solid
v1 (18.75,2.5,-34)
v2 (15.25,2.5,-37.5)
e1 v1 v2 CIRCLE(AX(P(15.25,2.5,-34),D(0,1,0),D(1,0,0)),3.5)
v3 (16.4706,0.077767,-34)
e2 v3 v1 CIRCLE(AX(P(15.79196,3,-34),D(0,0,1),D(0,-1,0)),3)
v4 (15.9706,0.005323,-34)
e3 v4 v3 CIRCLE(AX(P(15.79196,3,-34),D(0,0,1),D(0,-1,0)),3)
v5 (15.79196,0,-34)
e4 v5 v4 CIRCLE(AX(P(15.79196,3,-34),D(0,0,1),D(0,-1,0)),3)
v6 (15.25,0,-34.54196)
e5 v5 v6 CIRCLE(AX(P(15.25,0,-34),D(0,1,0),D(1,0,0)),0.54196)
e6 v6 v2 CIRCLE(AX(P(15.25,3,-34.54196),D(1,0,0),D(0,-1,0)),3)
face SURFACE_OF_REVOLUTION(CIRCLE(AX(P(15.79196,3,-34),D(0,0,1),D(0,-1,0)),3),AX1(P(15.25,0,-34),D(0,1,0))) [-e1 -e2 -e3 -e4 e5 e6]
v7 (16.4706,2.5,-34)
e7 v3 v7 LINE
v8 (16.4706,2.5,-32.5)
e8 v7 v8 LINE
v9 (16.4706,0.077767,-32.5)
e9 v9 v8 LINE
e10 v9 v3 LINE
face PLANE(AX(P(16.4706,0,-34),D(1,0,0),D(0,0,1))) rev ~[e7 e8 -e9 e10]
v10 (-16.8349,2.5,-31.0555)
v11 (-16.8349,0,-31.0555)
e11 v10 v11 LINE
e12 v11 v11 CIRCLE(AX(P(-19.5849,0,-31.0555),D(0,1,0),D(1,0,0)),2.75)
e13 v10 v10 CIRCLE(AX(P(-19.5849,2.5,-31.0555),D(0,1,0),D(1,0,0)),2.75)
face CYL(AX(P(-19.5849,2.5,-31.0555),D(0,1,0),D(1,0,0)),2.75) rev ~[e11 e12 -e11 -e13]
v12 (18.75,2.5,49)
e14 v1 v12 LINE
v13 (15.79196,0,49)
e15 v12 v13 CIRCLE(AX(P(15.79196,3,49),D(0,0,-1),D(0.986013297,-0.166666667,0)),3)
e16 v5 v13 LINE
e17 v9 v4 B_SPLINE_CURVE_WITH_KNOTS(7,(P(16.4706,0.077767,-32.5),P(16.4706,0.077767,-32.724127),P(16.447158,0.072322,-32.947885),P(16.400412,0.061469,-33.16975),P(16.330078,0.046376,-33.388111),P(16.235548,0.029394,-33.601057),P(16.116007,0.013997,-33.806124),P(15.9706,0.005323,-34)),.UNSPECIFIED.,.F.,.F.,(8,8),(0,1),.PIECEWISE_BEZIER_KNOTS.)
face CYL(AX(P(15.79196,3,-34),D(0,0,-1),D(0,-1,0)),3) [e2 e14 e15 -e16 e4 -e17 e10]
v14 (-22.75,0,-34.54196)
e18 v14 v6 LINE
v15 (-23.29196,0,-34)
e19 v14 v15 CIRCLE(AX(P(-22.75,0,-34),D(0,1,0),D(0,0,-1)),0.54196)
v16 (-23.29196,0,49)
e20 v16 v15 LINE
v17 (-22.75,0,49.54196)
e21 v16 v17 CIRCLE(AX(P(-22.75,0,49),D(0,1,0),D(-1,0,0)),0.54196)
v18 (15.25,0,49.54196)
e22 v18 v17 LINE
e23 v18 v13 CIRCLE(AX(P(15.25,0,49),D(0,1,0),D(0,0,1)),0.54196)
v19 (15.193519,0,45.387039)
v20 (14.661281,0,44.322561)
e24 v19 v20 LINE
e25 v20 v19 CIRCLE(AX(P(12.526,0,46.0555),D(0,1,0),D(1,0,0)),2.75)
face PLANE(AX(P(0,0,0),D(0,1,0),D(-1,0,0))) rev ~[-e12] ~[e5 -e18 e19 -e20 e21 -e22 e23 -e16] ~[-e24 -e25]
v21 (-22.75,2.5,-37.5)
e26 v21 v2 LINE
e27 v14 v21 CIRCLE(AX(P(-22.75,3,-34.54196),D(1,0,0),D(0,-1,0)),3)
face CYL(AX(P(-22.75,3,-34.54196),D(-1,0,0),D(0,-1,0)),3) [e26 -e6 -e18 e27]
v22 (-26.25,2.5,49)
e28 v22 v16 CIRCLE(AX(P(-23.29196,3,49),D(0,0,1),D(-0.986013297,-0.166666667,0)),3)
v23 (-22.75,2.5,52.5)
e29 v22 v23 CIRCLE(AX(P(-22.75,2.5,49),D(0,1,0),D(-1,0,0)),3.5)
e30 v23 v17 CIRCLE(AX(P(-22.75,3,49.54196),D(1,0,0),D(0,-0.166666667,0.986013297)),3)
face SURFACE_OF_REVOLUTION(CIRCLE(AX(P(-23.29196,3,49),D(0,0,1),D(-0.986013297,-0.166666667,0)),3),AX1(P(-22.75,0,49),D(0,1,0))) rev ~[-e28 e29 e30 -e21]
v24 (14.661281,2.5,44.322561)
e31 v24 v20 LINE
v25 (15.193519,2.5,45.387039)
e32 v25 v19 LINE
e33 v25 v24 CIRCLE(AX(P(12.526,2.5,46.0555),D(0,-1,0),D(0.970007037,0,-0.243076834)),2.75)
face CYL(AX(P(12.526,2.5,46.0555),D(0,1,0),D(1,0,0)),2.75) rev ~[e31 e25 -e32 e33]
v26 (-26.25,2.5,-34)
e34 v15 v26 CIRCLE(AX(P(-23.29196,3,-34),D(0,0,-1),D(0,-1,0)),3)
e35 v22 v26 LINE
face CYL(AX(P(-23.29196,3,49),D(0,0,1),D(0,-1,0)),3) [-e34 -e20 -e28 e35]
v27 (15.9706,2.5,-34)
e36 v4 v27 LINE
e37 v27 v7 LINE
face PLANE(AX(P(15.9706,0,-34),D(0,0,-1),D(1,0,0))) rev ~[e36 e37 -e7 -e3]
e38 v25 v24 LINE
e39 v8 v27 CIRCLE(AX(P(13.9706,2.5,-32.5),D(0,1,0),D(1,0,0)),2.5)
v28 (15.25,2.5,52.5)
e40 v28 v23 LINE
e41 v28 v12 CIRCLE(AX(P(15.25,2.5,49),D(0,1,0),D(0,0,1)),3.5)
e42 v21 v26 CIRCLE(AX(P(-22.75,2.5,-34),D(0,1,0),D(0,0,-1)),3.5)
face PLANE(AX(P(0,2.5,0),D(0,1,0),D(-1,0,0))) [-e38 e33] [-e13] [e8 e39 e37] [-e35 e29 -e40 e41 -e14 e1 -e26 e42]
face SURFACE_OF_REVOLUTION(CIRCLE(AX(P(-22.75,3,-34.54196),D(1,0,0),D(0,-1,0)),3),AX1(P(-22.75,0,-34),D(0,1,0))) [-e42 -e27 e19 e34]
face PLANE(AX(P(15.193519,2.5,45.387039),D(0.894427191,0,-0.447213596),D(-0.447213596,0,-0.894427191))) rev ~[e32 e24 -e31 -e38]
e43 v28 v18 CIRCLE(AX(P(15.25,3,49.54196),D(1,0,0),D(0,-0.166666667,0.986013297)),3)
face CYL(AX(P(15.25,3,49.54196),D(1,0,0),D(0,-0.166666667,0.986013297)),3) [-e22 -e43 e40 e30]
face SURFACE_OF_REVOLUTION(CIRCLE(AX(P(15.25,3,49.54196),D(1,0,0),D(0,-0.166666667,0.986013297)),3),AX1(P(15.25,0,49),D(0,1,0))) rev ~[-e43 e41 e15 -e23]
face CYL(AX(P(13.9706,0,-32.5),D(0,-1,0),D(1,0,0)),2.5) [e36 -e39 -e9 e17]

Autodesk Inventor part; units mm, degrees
ref_plane "YZ Plane" through (0, 0, 0) normal (1, 0, 0) x (0, 1, 0)
ref_plane "XZ Plane" through (0, 0, 0) normal (0, 1, 0) x (-1, 0, 0)
ref_plane "XY Plane" through (0, 0, 0) normal (0, 0, 1) x (1, 0, 0)
sketch "Sketch1" plane through (0, 0, 0) normal (0, 1, 0) x (-1, 0, 0)
  line L0 (-18.75, 52.5) -> (26.25, 52.5)
  line L1 (26.25, 52.5) -> (26.25, -37.5)
  line L2 (26.25, -37.5) -> (-18.75, -37.5)
  line L3 (-18.75, -37.5) -> (-18.75, 52.5)
  line L4 (26.25, 52.5) -> (-18.75, -37.5) construction
  line L5 (-16.4706, 50) -> (23.5294, 50)
  line L6 (23.5294, 50) -> (23.5294, -35)
  line L7 (23.5294, -35) -> (-16.4706, -35)
  line L8 (-16.4706, -35) -> (-16.4706, 50)
  line L9 (23.5294, 50) -> (-16.4706, -35) construction
  line L10 (23.5294, 50) -> (21.0294, 50)
  line L11 (21.0294, 50) -> (21.0294, 47.5)
  line L12 (21.0294, 47.5) -> (23.5294, 47.5)
  line L13 (23.5294, 47.5) -> (23.5294, 50)
  arc A0 (23.5294, 47.5) -> (21.0294, 50) centre (21.0294, 47.5) ccw
  line L14 (26.25, 52.5) -> (22.75, 52.5)
  line L15 (22.75, 52.5) -> (22.75, 49)
  line L16 (22.75, 49) -> (26.25, 49)
  line L17 (26.25, 49) -> (26.25, 52.5)
  line L18 (23.5294, -35) -> (21.0294, -35)
  line L19 (21.0294, -35) -> (21.0294, -32.5)
  line L20 (21.0294, -32.5) -> (23.5294, -32.5)
  line L21 (23.5294, -32.5) -> (23.5294, -35)
  line L22 (-16.4706, -35) -> (-13.9706, -35)
  line L23 (-13.9706, -35) -> (-13.9706, -32.5)
  line L24 (-13.9706, -32.5) -> (-16.4706, -32.5)
  line L25 (-16.4706, -32.5) -> (-16.4706, -35)
  line L26 (-16.4706, 50) -> (-13.9706, 50)
  line L27 (-13.9706, 50) -> (-13.9706, 47.5)
  line L28 (-13.9706, 47.5) -> (-16.4706, 47.5)
  line L29 (-16.4706, 47.5) -> (-16.4706, 50)
  arc A1 (-13.9706, 50) -> (-16.4706, 47.5) centre (-13.9706, 47.5) ccw
  arc A2 (-16.4706, -32.5) -> (-13.9706, -35) centre (-13.9706, -32.5) ccw
  arc A3 (21.0294, -35) -> (23.5294, -32.5) centre (21.0294, -32.5) ccw
  arc A4 (26.25, 49) -> (22.75, 52.5) centre (22.75, 49) ccw
  line L30 (26.25, -37.5) -> (22.75, -37.5)
  line L31 (22.75, -37.5) -> (22.75, -34)
  line L32 (22.75, -34) -> (26.25, -34)
  line L33 (26.25, -34) -> (26.25, -37.5)
  line L34 (-18.75, -37.5) -> (-15.25, -37.5)
  line L35 (-15.25, -37.5) -> (-15.25, -34)
  line L36 (-15.25, -34) -> (-18.75, -34)
  line L37 (-18.75, -34) -> (-18.75, -37.5)
  line L38 (-18.75, 52.5) -> (-15.25, 52.5)
  line L39 (-15.25, 52.5) -> (-15.25, 49)
  line L40 (-15.25, 49) -> (-18.75, 49)
  line L41 (-18.75, 49) -> (-18.75, 52.5)
  arc A5 (-15.25, 52.5) -> (-18.75, 49) centre (-15.25, 49) ccw
  arc A6 (-18.75, -34) -> (-15.25, -37.5) centre (-15.25, -34) ccw
  arc A7 (22.75, -37.5) -> (26.25, -34) centre (22.75, -34) ccw
  point P0 (0, 0)
  point P1 (26.25, 49)
  point P2 (22.75, 52.5)
  point P3 (-18.75, -34)
  point P4 (-16.4706, -32.5)
  point P5 (-15.9706, -34)
  point P6 (-16.4706, -34)
  point P7 (23.5294, -32.5)
  dimension "d0" = 45
  dimension "d1" = 90
  dimension "d2" = 40
  dimension "d3" = 85
  dimension "d8" = 2.5
  dimension "d9" = 2.5
extrude "Extrusion3" add sketch "Sketch1" along normal blind 2.5 contours L0 L15 L5 L39 | L39 L5 L8 L40 A5 | L40 L8 L36 L3 | A4 L16 L6 L5 L15 | L39 A1 L40 L8 L5 | L5 A1 L39 | L36 L8 L7 L35 A6 | L40 A1 L8 | L15 A0 L5 | L5 L6 L16 A0 L15 | L1 L32 L6 L16 | L5 L11 L12 L6 L20 L19 L7 L23 L24 L8 L28 L27 | L27 L28 A1 L40 L39 | L39 L40 A1 | L36 A2 L35 L7 L8 | L35 L7 L31 L2 | A0 L15 L16 L12 L11 | A0 L16 L15 | A7 L31 L7 L6 L32 | L6 A0 L16 | L24 L23 A2 L35 L36 | L36 L35 A2 | L35 A2 L7 | L32 A3 L6 | L6 L7 L31 A3 L32 | L7 A3 L31 | A3 L32 L31 L19 L20 | A3 L31 L32
fillet "Fillet1" radius 3 8 edges at (-25.2249, 0, 51.4749) (-3.75, 0, 52.5) (17.7249, 0, 51.4749) (18.75, 0, 7.5) (17.7249, 0, -36.4749) (-3.75, 0, -37.5) (-25.2249, 0, -36.4749) (-26.25, 0, 7.5)
sketch "Sketch2" plane through (0, 2.5, 0) normal (0, 1, 0) x (1, 0, 0)
  arc A0 (16.4706, 32.5) -> (13.9706, 35) centre (13.9706, 32.5) ccw projected
  line L0 (13.9706, 35) -> (13.9706, 33.5)
  line L1 (16.4706, -47.5) -> (16.4706, 32.5) projected
  line L2 (16.4706, 32.5) -> (14.9706, 32.5)
  line L3 (14.9706, 32.5) -> (13.9706, 33.5)
  line L4 (14.4706, 33) -> (12.526, 31.0555)
  circle A1 centre (12.526, 31.0555) radius 2.75
  line L5 (-23.5294, 32.5) -> (-23.5294, -47.5) projected
  line L6 (-23.5294, -47.5) -> (-22.0294, -47.5)
  line L7 (-21.0294, -50) -> (13.9706, -50) projected
  line L8 (-21.0294, -50) -> (-21.0294, -48.5)
  line L9 (-21.0294, -48.5) -> (-22.0294, -47.5)
  line L10 (-21.5294, -48) -> (-19.5849, -46.0555)
  line L11 (-21.5294, -48) -> (-18.7794, -48) construction
  circle A2 centre (-19.5849, -46.0555) radius 2.75
  arc A3 (14.0518, 28.7675) -> (15.276, 31.0555) centre (12.526, 31.0555) ccw construction
  arc A4 (14.321, 28.3639) -> (15.7612, 31.0555) centre (12.526, 31.0555) ccw
  arc A5 (13.7826, 29.1712) -> (14.7909, 31.0555) centre (12.526, 31.0555) ccw
  arc A6 (13.7826, 29.1712) -> (14.321, 28.3639) centre (14.0518, 28.7675) ccw
  arc A7 (15.7612, 31.0555) -> (14.7909, 31.0555) centre (15.276, 31.0555) ccw
  arc A8 (10.7311, 33.747) -> (9.2909, 31.0555) centre (12.526, 31.0555) ccw
  arc A9 (9.2909, 31.0555) -> (10.2612, 31.0555) centre (9.776, 31.0555) ccw
  arc A10 (11.2694, 32.9398) -> (10.7311, 33.747) centre (11.0003, 33.3434) ccw
  arc A11 (11.2694, 32.9398) -> (10.2612, 31.0555) centre (12.526, 31.0555) ccw
  arc A12 (-17.79, -48.747) -> (-16.3497, -46.0555) centre (-19.5849, -46.0555) ccw
  arc A13 (-18.3283, -47.9398) -> (-17.32, -46.0555) centre (-19.5849, -46.0555) ccw
  arc A14 (-18.3283, -47.9398) -> (-17.79, -48.747) centre (-18.0591, -48.3434) ccw
  arc A15 (-16.3497, -46.0555) -> (-17.32, -46.0555) centre (-16.8349, -46.0555) ccw
  arc A16 (-21.3798, -43.3639) -> (-22.82, -46.0555) centre (-19.5849, -46.0555) ccw
  arc A17 (-22.82, -46.0555) -> (-21.8497, -46.0555) centre (-22.3349, -46.0555) ccw
  arc A18 (-20.8415, -44.1712) -> (-21.3798, -43.3639) centre (-21.1106, -43.7675) ccw
  arc A19 (-20.8415, -44.1712) -> (-21.8497, -46.0555) centre (-19.5849, -46.0555) ccw
  line L12 (-22.8137, -49.2843) -> (-20.2452, -46.7157) construction
  line L13 (-22.3894, -49.7085) -> (-19.8209, -47.14)
  line L14 (-20.6694, -46.2915) -> (-23.2379, -48.86)
  arc A20 (-23.2379, -48.86) -> (-22.3894, -49.7085) centre (-22.8137, -49.2843) ccw
  arc A21 (-19.8209, -47.14) -> (-20.6694, -46.2915) centre (-20.2452, -46.7157) ccw
  line L15 (12.9911, 31.5205) -> (15.9501, 34.4795) construction
  line L16 (13.4153, 31.0962) -> (16.3744, 34.0552)
  line L17 (15.5258, 34.9038) -> (12.5668, 31.9448)
  arc A22 (12.5668, 31.9448) -> (13.4153, 31.0962) centre (12.9911, 31.5205) ccw
  arc A23 (16.3744, 34.0552) -> (15.5258, 34.9038) centre (15.9501, 34.4795) ccw
  arc A24 (15.25, -52.5) -> (18.75, -49) centre (15.25, -49) ccw projected
  line L18 (15.25, -52.5) -> (18.75, -52.5)
  line L19 (18.75, -52.5) -> (18.75, -49)
  arc A25 (-22.75, 37.5) -> (-26.25, 34) centre (-22.75, 34) ccw projected
  line L20 (-26.25, 34) -> (-26.25, 37.5)
  line L21 (15.25, 37.5) -> (-22.75, 37.5) projected
  line L22 (-26.25, 37.5) -> (-22.75, 37.5)
  line L23 (-22.75, -52.5) -> (15.25, -52.5) projected
  line L24 (-22.75, -52.5) -> (-26.25, -52.5)
  line L25 (-26.25, 34) -> (-26.25, -49) projected
  line L26 (-26.25, -52.5) -> (-26.25, -49)
  line L27 (18.75, -49) -> (18.75, 34) projected
  line L28 (18.75, 37.5) -> (18.75, 34)
  line L29 (15.25, 37.5) -> (15.25, 34.542) projected
  line L30 (18.75, 37.5) -> (15.25, 37.5)
  line L31 (-26.25, -52.5) -> (18.75, 37.5)
  line L32 (18.75, -52.5) -> (-26.25, 37.5)
  line L33 (-3.75, -7.5) -> (32.3445, -7.5)
  line L34 (-35.1724, -7.5) -> (-3.75, -7.5)
  circle A26 centre (12.526, -46.0555) radius 2.75
  circle A27 centre (-19.5849, 31.0555) radius 2.75
  point P0 (0, 0)
  point P1 (14.848, 32.5289)
  point P2 (13.9995, 33.3774)
  point P3 (11.4261, 33.5759)
  point P4 (9.8188, 30.5722)
  point P5 (13.626, 28.535)
  point P6 (15.2333, 31.5387)
  point P7 (-21.9068, -47.5289)
  point P8 (-21.0583, -48.3774)
  point P9 (-18.4849, -48.5759)
  point P10 (-16.8777, -45.5722)
  point P11 (-20.6848, -43.535)
  point P12 (-22.2921, -46.5387)
  point P13 (15.2624, 34.6404)
  point P14 (16.111, 33.7918)
  point P15 (14.6612, -44.3223)
  point P16 (15.1936, -45.3873)
  dimension "d32" = 5.5
  dimension "d29" = 1.5
  dimension "d30" = 1.5
  dimension "d31" = 2.75
  dimension "d33" = 1.5
  dimension "d34" = 1.5
  dimension "d35" = 2.75
  dimension "d36" = 45
  dimension "d37" = 5.5
  dimension "d40" = 360
  dimension "d44" = 1.2
  dimension "d45" = 1.2
extrude "Extrusion10" cut sketch "Sketch2" against normal blind 10 contours L32 A26 | A27 picked at (11.7147, -45.435)
sketch "Sketch4" plane through (0, 2.5, 0) normal (0, 1, 0) x (1, 0, 0)
  point P0 (0, 0)
properties part number "proper shit spodnji"
